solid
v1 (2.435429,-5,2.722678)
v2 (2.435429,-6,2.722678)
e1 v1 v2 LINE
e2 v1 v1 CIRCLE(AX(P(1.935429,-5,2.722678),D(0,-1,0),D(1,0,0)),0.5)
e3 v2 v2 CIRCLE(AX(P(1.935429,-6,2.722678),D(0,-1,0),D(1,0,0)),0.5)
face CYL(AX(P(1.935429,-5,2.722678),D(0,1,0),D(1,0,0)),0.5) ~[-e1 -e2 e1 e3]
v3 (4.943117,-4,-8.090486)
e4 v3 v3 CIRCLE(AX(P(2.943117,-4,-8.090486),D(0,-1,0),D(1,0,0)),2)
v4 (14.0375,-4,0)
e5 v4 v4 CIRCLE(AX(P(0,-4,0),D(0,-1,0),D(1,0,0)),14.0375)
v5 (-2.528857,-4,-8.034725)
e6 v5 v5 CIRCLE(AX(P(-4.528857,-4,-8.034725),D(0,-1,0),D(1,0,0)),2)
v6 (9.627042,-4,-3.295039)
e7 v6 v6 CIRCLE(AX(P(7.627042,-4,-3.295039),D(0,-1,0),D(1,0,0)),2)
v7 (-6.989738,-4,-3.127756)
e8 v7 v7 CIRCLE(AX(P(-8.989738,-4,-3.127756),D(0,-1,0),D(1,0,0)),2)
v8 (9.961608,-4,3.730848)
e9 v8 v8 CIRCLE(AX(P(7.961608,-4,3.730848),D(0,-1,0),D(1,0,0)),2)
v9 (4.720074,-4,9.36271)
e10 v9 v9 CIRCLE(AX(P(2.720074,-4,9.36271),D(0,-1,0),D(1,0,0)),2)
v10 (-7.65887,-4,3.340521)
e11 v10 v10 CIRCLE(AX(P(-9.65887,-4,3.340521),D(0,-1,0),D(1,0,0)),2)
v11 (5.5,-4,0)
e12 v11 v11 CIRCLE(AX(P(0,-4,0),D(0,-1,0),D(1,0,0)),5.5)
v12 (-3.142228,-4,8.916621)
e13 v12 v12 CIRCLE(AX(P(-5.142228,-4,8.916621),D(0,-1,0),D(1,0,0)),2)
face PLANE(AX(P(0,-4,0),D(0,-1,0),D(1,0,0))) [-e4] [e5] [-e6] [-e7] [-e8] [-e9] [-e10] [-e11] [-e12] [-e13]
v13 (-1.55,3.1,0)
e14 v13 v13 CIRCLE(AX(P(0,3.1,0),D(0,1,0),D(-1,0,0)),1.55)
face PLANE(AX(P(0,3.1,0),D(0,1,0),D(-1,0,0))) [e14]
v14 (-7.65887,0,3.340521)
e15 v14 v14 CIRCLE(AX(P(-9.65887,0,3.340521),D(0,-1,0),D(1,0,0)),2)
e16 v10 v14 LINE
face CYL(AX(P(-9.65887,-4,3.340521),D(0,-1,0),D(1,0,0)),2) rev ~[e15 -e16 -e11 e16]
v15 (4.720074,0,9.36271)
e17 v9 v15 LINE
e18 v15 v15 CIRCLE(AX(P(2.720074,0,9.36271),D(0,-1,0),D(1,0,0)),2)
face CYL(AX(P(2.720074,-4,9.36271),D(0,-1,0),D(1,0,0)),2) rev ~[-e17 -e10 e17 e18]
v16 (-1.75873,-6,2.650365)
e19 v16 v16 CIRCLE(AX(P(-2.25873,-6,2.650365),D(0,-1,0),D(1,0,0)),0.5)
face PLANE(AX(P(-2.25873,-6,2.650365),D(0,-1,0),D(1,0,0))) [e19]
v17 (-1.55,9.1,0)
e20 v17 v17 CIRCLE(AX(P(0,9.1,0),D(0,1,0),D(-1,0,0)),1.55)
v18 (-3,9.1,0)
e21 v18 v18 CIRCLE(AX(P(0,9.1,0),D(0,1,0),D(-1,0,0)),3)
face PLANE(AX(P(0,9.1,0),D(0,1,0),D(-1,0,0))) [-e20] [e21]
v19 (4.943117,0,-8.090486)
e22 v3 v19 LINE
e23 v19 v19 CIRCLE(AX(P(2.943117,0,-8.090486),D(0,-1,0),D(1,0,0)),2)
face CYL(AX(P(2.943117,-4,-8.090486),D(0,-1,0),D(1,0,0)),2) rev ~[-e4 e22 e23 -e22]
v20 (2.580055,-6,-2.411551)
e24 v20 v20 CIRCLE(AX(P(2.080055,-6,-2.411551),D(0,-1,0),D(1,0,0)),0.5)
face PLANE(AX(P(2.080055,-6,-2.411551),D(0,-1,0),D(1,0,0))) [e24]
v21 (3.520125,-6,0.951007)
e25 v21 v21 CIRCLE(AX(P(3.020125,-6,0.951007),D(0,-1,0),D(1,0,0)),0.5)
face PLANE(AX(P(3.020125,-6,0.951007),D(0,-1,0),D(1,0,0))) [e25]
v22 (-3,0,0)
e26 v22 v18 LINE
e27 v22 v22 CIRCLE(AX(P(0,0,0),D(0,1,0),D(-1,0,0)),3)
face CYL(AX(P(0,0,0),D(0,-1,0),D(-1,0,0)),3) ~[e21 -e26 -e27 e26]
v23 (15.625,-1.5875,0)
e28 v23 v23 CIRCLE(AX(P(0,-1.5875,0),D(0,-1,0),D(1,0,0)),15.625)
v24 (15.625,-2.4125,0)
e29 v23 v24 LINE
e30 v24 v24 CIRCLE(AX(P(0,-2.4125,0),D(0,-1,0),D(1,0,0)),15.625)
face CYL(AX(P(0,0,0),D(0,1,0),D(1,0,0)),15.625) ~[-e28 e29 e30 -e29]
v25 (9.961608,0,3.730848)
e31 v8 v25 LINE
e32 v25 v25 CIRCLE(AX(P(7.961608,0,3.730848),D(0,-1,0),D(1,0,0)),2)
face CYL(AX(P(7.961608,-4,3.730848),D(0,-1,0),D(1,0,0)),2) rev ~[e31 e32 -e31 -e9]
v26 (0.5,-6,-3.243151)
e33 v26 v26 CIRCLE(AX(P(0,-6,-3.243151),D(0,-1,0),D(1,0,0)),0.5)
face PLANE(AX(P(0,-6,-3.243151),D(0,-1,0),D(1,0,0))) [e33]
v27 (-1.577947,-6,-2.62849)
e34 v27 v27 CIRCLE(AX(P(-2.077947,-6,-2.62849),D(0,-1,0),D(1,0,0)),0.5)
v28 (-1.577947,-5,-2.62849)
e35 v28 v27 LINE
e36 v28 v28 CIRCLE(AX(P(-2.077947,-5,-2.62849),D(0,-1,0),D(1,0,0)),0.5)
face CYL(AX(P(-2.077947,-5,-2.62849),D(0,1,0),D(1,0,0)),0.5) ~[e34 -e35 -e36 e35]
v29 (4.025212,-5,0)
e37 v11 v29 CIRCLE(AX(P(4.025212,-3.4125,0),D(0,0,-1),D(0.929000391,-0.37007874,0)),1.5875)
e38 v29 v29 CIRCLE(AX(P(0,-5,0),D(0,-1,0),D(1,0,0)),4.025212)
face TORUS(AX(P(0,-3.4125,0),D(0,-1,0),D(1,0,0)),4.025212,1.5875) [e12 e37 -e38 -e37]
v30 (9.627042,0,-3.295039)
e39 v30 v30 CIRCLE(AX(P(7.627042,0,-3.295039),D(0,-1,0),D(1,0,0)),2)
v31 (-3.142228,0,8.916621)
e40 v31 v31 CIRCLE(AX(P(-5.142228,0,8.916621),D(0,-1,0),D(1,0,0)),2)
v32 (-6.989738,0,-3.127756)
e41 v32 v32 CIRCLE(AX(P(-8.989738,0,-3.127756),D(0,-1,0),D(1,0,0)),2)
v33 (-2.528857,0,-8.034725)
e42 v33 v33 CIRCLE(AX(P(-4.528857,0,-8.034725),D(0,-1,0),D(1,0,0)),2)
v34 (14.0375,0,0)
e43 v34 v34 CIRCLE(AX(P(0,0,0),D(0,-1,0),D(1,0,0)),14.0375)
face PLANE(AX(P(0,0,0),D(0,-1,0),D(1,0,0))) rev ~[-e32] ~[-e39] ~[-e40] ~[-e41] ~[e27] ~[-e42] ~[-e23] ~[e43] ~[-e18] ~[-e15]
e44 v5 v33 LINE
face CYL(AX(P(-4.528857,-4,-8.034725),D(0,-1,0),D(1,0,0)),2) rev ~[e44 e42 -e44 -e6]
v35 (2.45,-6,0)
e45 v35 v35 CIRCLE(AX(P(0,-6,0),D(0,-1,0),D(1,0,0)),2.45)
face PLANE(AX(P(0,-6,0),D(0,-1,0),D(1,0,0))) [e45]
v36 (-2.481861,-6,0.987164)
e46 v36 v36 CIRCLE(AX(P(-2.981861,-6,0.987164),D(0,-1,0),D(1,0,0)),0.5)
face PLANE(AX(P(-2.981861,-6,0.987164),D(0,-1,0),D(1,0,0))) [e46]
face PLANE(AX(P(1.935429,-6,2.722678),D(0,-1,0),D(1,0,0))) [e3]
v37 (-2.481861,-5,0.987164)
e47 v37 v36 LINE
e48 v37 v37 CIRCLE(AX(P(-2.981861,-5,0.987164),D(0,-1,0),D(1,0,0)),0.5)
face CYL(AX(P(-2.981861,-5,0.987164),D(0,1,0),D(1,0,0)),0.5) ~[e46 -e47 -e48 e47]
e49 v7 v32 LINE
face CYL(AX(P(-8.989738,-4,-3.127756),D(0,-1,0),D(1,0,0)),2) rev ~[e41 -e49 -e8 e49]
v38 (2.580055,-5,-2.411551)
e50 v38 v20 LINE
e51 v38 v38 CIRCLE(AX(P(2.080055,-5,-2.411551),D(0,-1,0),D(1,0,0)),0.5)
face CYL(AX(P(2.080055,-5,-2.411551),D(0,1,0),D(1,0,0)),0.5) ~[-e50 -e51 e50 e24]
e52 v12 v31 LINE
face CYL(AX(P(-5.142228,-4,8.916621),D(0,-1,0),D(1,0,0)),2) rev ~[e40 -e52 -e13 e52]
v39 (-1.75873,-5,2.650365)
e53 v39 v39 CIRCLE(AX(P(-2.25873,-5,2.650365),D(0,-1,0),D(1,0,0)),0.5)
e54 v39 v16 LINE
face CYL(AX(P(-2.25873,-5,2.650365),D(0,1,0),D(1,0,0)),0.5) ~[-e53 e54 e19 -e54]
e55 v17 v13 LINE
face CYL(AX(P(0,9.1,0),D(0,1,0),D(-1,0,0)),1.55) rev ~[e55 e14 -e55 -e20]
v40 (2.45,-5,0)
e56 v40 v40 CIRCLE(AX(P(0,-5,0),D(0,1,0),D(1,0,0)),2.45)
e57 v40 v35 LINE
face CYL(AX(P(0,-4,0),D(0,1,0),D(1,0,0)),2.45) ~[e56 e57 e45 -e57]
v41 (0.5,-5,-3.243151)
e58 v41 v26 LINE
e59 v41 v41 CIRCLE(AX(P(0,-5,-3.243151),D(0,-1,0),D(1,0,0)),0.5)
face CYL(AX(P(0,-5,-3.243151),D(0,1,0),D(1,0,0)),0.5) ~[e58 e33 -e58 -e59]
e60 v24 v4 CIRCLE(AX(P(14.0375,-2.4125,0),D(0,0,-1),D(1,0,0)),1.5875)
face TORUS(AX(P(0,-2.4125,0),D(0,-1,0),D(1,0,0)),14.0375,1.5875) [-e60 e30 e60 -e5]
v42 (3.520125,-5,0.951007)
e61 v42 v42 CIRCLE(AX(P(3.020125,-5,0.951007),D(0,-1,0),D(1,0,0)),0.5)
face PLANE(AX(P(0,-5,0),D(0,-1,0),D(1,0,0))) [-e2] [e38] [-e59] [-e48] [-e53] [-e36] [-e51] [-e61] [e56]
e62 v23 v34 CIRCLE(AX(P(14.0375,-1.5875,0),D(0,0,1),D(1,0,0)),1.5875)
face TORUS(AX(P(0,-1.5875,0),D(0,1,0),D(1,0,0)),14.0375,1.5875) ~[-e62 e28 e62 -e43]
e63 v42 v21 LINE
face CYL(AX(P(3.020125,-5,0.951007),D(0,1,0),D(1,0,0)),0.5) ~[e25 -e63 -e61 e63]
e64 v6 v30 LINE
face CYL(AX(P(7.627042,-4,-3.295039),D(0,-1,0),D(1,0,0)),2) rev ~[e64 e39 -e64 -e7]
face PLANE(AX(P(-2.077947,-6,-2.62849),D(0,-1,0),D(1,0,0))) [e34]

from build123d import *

# Parameters (mm, degrees)
F0_R      = 15.625
F1_DEPTH  = 4
F2_R      = 2.45
F3_DEPTH  = 2
F4_R      = 3
F5_DEPTH  = 9.1
F6_R      = 1.55
F7_DEPTH  = 6
F8_R      = 5.5
F9_DEPTH  = 1
F11_R     = 0.5
F12_DEPTH = 1
F13_R     = 2
F14_DEPTH = 25.4


# Not quite as in the source:
# - a fillet or chamfer that OpenCascade refuses, or shapes differently, is made with other operations: its cross-section is extruded or revolved along the edge and cut away or added


with BuildPart() as f1:
    # F0 (on Front) → F1 (new body)
    with BuildSketch(Plane.XZ):
        Circle(F0_R)
    extrude(amount=F1_DEPTH)

    # F2 (on face) → F3 (join)
    with BuildSketch(Plane.XZ.offset(4)):
        Circle(F2_R)
    extrude(amount=F3_DEPTH)

    # F4 (on face) → F5 (join)
    with BuildSketch(Plane(origin=(0, 0, 0), x_dir=(-1, 0, 0), z_dir=(0, 1, 0))):
        Circle(F4_R)
    extrude(amount=F5_DEPTH)

    # F6 (on face) → F7 (cut)
    with BuildSketch(Plane(origin=(0, 9.1, 0), x_dir=(-1, 0, 0), z_dir=(0, 1, 0))):
        Circle(F6_R)
    extrude(amount=-F7_DEPTH, mode=Mode.SUBTRACT)

    # F8 (on face) → F9 (join)
    with BuildSketch(Plane.XZ.offset(4)):
        Circle(F8_R)
    extrude(amount=F9_DEPTH)

    # F10: fillet of radius 1.5875 on 3 edges, made by hand

    # F10_s1 → F10_t2 (revolve, cut)
    with BuildSketch(Plane.XY):
        with BuildLine():
            ThreePointArc((15.625, -2.4125), (15.1600320151, -3.5350320151), (14.0375, -4))
            Line((14.0375, -4), (15.625, -4))
            Line((15.625, -4), (15.625, -2.4125))
        make_face()
    revolve(axis=Axis((0, -4, 0), (0, -1, 0)), mode=Mode.SUBTRACT)

    # F10_s3 → F10_t4 (revolve, cut)
    with BuildSketch(Plane.XY):
        with BuildLine():
            ThreePointArc((15.625, -1.5875), (15.1600320151, -0.4649679849), (14.0375, 0))
            Line((14.0375, 0), (15.625, 0))
            Line((15.625, 0), (15.625, -1.5875))
        make_face()
    revolve(axis=Axis((0, 0, 0), (0, -1, 0)), mode=Mode.SUBTRACT)

    # F10_s5 → F10_t6 (revolve, cut)
    with BuildSketch(Plane.XY):
        with BuildLine():
            ThreePointArc((5.5, -4), (4.9161383637, -4.7264277948), (4.0252118796, -5))
            Line((4.0252118796, -5), (5.5, -5))
            Line((5.5, -5), (5.5, -4))
        make_face()
    revolve(axis=Axis((0, -5, 0), (0, -1, 0)), mode=Mode.SUBTRACT)

    # F11 (on face) → F12 (join)
    with BuildSketch(Plane.XZ.offset(5)):
        with Locations((-2.9818608891, 0.9871639777)):
            Circle(F11_R)
        with Locations((-2.258730121, 2.6503647678)):
            Circle(F11_R)
        with Locations((1.9354285905, 2.7226777747)):
            Circle(F11_R)
        with Locations((3.0201247428, 0.9510074742)):
            Circle(F11_R)
        with Locations((2.0800547209, -2.4115508422)):
            Circle(F11_R)
        with Locations((0, -3.2431513537)):
            Circle(F11_R)
        with Locations((-2.0779473707, -2.628490096)):
            Circle(F11_R)
    extrude(amount=F12_DEPTH)

    # F13 (on face) → F14 (cut)
    with BuildSketch(Plane.XZ.offset(4)):
        with Locations((-5.1422282122, 8.9166210964)):
            Circle(F13_R)
        with Locations((2.720073564, 9.3627097085)):
            Circle(F13_R)
        with Locations((7.9616084695, 3.7308477331)):
            Circle(F13_R)
        with Locations((7.6270420104, -3.2950392924)):
            Circle(F13_R)
        with Locations((2.9431174044, -8.0904858187)):
            Circle(F13_R)
        with Locations((-4.5288573019, -8.0347247422)):
            Circle(F13_R)
        with Locations((-8.9897383004, -3.1277562957)):
            Circle(F13_R)
        with Locations((-9.6588702872, 3.3405206632)):
            Circle(F13_R)
    extrude(amount=-F14_DEPTH, mode=Mode.SUBTRACT)


solid = f1.part
